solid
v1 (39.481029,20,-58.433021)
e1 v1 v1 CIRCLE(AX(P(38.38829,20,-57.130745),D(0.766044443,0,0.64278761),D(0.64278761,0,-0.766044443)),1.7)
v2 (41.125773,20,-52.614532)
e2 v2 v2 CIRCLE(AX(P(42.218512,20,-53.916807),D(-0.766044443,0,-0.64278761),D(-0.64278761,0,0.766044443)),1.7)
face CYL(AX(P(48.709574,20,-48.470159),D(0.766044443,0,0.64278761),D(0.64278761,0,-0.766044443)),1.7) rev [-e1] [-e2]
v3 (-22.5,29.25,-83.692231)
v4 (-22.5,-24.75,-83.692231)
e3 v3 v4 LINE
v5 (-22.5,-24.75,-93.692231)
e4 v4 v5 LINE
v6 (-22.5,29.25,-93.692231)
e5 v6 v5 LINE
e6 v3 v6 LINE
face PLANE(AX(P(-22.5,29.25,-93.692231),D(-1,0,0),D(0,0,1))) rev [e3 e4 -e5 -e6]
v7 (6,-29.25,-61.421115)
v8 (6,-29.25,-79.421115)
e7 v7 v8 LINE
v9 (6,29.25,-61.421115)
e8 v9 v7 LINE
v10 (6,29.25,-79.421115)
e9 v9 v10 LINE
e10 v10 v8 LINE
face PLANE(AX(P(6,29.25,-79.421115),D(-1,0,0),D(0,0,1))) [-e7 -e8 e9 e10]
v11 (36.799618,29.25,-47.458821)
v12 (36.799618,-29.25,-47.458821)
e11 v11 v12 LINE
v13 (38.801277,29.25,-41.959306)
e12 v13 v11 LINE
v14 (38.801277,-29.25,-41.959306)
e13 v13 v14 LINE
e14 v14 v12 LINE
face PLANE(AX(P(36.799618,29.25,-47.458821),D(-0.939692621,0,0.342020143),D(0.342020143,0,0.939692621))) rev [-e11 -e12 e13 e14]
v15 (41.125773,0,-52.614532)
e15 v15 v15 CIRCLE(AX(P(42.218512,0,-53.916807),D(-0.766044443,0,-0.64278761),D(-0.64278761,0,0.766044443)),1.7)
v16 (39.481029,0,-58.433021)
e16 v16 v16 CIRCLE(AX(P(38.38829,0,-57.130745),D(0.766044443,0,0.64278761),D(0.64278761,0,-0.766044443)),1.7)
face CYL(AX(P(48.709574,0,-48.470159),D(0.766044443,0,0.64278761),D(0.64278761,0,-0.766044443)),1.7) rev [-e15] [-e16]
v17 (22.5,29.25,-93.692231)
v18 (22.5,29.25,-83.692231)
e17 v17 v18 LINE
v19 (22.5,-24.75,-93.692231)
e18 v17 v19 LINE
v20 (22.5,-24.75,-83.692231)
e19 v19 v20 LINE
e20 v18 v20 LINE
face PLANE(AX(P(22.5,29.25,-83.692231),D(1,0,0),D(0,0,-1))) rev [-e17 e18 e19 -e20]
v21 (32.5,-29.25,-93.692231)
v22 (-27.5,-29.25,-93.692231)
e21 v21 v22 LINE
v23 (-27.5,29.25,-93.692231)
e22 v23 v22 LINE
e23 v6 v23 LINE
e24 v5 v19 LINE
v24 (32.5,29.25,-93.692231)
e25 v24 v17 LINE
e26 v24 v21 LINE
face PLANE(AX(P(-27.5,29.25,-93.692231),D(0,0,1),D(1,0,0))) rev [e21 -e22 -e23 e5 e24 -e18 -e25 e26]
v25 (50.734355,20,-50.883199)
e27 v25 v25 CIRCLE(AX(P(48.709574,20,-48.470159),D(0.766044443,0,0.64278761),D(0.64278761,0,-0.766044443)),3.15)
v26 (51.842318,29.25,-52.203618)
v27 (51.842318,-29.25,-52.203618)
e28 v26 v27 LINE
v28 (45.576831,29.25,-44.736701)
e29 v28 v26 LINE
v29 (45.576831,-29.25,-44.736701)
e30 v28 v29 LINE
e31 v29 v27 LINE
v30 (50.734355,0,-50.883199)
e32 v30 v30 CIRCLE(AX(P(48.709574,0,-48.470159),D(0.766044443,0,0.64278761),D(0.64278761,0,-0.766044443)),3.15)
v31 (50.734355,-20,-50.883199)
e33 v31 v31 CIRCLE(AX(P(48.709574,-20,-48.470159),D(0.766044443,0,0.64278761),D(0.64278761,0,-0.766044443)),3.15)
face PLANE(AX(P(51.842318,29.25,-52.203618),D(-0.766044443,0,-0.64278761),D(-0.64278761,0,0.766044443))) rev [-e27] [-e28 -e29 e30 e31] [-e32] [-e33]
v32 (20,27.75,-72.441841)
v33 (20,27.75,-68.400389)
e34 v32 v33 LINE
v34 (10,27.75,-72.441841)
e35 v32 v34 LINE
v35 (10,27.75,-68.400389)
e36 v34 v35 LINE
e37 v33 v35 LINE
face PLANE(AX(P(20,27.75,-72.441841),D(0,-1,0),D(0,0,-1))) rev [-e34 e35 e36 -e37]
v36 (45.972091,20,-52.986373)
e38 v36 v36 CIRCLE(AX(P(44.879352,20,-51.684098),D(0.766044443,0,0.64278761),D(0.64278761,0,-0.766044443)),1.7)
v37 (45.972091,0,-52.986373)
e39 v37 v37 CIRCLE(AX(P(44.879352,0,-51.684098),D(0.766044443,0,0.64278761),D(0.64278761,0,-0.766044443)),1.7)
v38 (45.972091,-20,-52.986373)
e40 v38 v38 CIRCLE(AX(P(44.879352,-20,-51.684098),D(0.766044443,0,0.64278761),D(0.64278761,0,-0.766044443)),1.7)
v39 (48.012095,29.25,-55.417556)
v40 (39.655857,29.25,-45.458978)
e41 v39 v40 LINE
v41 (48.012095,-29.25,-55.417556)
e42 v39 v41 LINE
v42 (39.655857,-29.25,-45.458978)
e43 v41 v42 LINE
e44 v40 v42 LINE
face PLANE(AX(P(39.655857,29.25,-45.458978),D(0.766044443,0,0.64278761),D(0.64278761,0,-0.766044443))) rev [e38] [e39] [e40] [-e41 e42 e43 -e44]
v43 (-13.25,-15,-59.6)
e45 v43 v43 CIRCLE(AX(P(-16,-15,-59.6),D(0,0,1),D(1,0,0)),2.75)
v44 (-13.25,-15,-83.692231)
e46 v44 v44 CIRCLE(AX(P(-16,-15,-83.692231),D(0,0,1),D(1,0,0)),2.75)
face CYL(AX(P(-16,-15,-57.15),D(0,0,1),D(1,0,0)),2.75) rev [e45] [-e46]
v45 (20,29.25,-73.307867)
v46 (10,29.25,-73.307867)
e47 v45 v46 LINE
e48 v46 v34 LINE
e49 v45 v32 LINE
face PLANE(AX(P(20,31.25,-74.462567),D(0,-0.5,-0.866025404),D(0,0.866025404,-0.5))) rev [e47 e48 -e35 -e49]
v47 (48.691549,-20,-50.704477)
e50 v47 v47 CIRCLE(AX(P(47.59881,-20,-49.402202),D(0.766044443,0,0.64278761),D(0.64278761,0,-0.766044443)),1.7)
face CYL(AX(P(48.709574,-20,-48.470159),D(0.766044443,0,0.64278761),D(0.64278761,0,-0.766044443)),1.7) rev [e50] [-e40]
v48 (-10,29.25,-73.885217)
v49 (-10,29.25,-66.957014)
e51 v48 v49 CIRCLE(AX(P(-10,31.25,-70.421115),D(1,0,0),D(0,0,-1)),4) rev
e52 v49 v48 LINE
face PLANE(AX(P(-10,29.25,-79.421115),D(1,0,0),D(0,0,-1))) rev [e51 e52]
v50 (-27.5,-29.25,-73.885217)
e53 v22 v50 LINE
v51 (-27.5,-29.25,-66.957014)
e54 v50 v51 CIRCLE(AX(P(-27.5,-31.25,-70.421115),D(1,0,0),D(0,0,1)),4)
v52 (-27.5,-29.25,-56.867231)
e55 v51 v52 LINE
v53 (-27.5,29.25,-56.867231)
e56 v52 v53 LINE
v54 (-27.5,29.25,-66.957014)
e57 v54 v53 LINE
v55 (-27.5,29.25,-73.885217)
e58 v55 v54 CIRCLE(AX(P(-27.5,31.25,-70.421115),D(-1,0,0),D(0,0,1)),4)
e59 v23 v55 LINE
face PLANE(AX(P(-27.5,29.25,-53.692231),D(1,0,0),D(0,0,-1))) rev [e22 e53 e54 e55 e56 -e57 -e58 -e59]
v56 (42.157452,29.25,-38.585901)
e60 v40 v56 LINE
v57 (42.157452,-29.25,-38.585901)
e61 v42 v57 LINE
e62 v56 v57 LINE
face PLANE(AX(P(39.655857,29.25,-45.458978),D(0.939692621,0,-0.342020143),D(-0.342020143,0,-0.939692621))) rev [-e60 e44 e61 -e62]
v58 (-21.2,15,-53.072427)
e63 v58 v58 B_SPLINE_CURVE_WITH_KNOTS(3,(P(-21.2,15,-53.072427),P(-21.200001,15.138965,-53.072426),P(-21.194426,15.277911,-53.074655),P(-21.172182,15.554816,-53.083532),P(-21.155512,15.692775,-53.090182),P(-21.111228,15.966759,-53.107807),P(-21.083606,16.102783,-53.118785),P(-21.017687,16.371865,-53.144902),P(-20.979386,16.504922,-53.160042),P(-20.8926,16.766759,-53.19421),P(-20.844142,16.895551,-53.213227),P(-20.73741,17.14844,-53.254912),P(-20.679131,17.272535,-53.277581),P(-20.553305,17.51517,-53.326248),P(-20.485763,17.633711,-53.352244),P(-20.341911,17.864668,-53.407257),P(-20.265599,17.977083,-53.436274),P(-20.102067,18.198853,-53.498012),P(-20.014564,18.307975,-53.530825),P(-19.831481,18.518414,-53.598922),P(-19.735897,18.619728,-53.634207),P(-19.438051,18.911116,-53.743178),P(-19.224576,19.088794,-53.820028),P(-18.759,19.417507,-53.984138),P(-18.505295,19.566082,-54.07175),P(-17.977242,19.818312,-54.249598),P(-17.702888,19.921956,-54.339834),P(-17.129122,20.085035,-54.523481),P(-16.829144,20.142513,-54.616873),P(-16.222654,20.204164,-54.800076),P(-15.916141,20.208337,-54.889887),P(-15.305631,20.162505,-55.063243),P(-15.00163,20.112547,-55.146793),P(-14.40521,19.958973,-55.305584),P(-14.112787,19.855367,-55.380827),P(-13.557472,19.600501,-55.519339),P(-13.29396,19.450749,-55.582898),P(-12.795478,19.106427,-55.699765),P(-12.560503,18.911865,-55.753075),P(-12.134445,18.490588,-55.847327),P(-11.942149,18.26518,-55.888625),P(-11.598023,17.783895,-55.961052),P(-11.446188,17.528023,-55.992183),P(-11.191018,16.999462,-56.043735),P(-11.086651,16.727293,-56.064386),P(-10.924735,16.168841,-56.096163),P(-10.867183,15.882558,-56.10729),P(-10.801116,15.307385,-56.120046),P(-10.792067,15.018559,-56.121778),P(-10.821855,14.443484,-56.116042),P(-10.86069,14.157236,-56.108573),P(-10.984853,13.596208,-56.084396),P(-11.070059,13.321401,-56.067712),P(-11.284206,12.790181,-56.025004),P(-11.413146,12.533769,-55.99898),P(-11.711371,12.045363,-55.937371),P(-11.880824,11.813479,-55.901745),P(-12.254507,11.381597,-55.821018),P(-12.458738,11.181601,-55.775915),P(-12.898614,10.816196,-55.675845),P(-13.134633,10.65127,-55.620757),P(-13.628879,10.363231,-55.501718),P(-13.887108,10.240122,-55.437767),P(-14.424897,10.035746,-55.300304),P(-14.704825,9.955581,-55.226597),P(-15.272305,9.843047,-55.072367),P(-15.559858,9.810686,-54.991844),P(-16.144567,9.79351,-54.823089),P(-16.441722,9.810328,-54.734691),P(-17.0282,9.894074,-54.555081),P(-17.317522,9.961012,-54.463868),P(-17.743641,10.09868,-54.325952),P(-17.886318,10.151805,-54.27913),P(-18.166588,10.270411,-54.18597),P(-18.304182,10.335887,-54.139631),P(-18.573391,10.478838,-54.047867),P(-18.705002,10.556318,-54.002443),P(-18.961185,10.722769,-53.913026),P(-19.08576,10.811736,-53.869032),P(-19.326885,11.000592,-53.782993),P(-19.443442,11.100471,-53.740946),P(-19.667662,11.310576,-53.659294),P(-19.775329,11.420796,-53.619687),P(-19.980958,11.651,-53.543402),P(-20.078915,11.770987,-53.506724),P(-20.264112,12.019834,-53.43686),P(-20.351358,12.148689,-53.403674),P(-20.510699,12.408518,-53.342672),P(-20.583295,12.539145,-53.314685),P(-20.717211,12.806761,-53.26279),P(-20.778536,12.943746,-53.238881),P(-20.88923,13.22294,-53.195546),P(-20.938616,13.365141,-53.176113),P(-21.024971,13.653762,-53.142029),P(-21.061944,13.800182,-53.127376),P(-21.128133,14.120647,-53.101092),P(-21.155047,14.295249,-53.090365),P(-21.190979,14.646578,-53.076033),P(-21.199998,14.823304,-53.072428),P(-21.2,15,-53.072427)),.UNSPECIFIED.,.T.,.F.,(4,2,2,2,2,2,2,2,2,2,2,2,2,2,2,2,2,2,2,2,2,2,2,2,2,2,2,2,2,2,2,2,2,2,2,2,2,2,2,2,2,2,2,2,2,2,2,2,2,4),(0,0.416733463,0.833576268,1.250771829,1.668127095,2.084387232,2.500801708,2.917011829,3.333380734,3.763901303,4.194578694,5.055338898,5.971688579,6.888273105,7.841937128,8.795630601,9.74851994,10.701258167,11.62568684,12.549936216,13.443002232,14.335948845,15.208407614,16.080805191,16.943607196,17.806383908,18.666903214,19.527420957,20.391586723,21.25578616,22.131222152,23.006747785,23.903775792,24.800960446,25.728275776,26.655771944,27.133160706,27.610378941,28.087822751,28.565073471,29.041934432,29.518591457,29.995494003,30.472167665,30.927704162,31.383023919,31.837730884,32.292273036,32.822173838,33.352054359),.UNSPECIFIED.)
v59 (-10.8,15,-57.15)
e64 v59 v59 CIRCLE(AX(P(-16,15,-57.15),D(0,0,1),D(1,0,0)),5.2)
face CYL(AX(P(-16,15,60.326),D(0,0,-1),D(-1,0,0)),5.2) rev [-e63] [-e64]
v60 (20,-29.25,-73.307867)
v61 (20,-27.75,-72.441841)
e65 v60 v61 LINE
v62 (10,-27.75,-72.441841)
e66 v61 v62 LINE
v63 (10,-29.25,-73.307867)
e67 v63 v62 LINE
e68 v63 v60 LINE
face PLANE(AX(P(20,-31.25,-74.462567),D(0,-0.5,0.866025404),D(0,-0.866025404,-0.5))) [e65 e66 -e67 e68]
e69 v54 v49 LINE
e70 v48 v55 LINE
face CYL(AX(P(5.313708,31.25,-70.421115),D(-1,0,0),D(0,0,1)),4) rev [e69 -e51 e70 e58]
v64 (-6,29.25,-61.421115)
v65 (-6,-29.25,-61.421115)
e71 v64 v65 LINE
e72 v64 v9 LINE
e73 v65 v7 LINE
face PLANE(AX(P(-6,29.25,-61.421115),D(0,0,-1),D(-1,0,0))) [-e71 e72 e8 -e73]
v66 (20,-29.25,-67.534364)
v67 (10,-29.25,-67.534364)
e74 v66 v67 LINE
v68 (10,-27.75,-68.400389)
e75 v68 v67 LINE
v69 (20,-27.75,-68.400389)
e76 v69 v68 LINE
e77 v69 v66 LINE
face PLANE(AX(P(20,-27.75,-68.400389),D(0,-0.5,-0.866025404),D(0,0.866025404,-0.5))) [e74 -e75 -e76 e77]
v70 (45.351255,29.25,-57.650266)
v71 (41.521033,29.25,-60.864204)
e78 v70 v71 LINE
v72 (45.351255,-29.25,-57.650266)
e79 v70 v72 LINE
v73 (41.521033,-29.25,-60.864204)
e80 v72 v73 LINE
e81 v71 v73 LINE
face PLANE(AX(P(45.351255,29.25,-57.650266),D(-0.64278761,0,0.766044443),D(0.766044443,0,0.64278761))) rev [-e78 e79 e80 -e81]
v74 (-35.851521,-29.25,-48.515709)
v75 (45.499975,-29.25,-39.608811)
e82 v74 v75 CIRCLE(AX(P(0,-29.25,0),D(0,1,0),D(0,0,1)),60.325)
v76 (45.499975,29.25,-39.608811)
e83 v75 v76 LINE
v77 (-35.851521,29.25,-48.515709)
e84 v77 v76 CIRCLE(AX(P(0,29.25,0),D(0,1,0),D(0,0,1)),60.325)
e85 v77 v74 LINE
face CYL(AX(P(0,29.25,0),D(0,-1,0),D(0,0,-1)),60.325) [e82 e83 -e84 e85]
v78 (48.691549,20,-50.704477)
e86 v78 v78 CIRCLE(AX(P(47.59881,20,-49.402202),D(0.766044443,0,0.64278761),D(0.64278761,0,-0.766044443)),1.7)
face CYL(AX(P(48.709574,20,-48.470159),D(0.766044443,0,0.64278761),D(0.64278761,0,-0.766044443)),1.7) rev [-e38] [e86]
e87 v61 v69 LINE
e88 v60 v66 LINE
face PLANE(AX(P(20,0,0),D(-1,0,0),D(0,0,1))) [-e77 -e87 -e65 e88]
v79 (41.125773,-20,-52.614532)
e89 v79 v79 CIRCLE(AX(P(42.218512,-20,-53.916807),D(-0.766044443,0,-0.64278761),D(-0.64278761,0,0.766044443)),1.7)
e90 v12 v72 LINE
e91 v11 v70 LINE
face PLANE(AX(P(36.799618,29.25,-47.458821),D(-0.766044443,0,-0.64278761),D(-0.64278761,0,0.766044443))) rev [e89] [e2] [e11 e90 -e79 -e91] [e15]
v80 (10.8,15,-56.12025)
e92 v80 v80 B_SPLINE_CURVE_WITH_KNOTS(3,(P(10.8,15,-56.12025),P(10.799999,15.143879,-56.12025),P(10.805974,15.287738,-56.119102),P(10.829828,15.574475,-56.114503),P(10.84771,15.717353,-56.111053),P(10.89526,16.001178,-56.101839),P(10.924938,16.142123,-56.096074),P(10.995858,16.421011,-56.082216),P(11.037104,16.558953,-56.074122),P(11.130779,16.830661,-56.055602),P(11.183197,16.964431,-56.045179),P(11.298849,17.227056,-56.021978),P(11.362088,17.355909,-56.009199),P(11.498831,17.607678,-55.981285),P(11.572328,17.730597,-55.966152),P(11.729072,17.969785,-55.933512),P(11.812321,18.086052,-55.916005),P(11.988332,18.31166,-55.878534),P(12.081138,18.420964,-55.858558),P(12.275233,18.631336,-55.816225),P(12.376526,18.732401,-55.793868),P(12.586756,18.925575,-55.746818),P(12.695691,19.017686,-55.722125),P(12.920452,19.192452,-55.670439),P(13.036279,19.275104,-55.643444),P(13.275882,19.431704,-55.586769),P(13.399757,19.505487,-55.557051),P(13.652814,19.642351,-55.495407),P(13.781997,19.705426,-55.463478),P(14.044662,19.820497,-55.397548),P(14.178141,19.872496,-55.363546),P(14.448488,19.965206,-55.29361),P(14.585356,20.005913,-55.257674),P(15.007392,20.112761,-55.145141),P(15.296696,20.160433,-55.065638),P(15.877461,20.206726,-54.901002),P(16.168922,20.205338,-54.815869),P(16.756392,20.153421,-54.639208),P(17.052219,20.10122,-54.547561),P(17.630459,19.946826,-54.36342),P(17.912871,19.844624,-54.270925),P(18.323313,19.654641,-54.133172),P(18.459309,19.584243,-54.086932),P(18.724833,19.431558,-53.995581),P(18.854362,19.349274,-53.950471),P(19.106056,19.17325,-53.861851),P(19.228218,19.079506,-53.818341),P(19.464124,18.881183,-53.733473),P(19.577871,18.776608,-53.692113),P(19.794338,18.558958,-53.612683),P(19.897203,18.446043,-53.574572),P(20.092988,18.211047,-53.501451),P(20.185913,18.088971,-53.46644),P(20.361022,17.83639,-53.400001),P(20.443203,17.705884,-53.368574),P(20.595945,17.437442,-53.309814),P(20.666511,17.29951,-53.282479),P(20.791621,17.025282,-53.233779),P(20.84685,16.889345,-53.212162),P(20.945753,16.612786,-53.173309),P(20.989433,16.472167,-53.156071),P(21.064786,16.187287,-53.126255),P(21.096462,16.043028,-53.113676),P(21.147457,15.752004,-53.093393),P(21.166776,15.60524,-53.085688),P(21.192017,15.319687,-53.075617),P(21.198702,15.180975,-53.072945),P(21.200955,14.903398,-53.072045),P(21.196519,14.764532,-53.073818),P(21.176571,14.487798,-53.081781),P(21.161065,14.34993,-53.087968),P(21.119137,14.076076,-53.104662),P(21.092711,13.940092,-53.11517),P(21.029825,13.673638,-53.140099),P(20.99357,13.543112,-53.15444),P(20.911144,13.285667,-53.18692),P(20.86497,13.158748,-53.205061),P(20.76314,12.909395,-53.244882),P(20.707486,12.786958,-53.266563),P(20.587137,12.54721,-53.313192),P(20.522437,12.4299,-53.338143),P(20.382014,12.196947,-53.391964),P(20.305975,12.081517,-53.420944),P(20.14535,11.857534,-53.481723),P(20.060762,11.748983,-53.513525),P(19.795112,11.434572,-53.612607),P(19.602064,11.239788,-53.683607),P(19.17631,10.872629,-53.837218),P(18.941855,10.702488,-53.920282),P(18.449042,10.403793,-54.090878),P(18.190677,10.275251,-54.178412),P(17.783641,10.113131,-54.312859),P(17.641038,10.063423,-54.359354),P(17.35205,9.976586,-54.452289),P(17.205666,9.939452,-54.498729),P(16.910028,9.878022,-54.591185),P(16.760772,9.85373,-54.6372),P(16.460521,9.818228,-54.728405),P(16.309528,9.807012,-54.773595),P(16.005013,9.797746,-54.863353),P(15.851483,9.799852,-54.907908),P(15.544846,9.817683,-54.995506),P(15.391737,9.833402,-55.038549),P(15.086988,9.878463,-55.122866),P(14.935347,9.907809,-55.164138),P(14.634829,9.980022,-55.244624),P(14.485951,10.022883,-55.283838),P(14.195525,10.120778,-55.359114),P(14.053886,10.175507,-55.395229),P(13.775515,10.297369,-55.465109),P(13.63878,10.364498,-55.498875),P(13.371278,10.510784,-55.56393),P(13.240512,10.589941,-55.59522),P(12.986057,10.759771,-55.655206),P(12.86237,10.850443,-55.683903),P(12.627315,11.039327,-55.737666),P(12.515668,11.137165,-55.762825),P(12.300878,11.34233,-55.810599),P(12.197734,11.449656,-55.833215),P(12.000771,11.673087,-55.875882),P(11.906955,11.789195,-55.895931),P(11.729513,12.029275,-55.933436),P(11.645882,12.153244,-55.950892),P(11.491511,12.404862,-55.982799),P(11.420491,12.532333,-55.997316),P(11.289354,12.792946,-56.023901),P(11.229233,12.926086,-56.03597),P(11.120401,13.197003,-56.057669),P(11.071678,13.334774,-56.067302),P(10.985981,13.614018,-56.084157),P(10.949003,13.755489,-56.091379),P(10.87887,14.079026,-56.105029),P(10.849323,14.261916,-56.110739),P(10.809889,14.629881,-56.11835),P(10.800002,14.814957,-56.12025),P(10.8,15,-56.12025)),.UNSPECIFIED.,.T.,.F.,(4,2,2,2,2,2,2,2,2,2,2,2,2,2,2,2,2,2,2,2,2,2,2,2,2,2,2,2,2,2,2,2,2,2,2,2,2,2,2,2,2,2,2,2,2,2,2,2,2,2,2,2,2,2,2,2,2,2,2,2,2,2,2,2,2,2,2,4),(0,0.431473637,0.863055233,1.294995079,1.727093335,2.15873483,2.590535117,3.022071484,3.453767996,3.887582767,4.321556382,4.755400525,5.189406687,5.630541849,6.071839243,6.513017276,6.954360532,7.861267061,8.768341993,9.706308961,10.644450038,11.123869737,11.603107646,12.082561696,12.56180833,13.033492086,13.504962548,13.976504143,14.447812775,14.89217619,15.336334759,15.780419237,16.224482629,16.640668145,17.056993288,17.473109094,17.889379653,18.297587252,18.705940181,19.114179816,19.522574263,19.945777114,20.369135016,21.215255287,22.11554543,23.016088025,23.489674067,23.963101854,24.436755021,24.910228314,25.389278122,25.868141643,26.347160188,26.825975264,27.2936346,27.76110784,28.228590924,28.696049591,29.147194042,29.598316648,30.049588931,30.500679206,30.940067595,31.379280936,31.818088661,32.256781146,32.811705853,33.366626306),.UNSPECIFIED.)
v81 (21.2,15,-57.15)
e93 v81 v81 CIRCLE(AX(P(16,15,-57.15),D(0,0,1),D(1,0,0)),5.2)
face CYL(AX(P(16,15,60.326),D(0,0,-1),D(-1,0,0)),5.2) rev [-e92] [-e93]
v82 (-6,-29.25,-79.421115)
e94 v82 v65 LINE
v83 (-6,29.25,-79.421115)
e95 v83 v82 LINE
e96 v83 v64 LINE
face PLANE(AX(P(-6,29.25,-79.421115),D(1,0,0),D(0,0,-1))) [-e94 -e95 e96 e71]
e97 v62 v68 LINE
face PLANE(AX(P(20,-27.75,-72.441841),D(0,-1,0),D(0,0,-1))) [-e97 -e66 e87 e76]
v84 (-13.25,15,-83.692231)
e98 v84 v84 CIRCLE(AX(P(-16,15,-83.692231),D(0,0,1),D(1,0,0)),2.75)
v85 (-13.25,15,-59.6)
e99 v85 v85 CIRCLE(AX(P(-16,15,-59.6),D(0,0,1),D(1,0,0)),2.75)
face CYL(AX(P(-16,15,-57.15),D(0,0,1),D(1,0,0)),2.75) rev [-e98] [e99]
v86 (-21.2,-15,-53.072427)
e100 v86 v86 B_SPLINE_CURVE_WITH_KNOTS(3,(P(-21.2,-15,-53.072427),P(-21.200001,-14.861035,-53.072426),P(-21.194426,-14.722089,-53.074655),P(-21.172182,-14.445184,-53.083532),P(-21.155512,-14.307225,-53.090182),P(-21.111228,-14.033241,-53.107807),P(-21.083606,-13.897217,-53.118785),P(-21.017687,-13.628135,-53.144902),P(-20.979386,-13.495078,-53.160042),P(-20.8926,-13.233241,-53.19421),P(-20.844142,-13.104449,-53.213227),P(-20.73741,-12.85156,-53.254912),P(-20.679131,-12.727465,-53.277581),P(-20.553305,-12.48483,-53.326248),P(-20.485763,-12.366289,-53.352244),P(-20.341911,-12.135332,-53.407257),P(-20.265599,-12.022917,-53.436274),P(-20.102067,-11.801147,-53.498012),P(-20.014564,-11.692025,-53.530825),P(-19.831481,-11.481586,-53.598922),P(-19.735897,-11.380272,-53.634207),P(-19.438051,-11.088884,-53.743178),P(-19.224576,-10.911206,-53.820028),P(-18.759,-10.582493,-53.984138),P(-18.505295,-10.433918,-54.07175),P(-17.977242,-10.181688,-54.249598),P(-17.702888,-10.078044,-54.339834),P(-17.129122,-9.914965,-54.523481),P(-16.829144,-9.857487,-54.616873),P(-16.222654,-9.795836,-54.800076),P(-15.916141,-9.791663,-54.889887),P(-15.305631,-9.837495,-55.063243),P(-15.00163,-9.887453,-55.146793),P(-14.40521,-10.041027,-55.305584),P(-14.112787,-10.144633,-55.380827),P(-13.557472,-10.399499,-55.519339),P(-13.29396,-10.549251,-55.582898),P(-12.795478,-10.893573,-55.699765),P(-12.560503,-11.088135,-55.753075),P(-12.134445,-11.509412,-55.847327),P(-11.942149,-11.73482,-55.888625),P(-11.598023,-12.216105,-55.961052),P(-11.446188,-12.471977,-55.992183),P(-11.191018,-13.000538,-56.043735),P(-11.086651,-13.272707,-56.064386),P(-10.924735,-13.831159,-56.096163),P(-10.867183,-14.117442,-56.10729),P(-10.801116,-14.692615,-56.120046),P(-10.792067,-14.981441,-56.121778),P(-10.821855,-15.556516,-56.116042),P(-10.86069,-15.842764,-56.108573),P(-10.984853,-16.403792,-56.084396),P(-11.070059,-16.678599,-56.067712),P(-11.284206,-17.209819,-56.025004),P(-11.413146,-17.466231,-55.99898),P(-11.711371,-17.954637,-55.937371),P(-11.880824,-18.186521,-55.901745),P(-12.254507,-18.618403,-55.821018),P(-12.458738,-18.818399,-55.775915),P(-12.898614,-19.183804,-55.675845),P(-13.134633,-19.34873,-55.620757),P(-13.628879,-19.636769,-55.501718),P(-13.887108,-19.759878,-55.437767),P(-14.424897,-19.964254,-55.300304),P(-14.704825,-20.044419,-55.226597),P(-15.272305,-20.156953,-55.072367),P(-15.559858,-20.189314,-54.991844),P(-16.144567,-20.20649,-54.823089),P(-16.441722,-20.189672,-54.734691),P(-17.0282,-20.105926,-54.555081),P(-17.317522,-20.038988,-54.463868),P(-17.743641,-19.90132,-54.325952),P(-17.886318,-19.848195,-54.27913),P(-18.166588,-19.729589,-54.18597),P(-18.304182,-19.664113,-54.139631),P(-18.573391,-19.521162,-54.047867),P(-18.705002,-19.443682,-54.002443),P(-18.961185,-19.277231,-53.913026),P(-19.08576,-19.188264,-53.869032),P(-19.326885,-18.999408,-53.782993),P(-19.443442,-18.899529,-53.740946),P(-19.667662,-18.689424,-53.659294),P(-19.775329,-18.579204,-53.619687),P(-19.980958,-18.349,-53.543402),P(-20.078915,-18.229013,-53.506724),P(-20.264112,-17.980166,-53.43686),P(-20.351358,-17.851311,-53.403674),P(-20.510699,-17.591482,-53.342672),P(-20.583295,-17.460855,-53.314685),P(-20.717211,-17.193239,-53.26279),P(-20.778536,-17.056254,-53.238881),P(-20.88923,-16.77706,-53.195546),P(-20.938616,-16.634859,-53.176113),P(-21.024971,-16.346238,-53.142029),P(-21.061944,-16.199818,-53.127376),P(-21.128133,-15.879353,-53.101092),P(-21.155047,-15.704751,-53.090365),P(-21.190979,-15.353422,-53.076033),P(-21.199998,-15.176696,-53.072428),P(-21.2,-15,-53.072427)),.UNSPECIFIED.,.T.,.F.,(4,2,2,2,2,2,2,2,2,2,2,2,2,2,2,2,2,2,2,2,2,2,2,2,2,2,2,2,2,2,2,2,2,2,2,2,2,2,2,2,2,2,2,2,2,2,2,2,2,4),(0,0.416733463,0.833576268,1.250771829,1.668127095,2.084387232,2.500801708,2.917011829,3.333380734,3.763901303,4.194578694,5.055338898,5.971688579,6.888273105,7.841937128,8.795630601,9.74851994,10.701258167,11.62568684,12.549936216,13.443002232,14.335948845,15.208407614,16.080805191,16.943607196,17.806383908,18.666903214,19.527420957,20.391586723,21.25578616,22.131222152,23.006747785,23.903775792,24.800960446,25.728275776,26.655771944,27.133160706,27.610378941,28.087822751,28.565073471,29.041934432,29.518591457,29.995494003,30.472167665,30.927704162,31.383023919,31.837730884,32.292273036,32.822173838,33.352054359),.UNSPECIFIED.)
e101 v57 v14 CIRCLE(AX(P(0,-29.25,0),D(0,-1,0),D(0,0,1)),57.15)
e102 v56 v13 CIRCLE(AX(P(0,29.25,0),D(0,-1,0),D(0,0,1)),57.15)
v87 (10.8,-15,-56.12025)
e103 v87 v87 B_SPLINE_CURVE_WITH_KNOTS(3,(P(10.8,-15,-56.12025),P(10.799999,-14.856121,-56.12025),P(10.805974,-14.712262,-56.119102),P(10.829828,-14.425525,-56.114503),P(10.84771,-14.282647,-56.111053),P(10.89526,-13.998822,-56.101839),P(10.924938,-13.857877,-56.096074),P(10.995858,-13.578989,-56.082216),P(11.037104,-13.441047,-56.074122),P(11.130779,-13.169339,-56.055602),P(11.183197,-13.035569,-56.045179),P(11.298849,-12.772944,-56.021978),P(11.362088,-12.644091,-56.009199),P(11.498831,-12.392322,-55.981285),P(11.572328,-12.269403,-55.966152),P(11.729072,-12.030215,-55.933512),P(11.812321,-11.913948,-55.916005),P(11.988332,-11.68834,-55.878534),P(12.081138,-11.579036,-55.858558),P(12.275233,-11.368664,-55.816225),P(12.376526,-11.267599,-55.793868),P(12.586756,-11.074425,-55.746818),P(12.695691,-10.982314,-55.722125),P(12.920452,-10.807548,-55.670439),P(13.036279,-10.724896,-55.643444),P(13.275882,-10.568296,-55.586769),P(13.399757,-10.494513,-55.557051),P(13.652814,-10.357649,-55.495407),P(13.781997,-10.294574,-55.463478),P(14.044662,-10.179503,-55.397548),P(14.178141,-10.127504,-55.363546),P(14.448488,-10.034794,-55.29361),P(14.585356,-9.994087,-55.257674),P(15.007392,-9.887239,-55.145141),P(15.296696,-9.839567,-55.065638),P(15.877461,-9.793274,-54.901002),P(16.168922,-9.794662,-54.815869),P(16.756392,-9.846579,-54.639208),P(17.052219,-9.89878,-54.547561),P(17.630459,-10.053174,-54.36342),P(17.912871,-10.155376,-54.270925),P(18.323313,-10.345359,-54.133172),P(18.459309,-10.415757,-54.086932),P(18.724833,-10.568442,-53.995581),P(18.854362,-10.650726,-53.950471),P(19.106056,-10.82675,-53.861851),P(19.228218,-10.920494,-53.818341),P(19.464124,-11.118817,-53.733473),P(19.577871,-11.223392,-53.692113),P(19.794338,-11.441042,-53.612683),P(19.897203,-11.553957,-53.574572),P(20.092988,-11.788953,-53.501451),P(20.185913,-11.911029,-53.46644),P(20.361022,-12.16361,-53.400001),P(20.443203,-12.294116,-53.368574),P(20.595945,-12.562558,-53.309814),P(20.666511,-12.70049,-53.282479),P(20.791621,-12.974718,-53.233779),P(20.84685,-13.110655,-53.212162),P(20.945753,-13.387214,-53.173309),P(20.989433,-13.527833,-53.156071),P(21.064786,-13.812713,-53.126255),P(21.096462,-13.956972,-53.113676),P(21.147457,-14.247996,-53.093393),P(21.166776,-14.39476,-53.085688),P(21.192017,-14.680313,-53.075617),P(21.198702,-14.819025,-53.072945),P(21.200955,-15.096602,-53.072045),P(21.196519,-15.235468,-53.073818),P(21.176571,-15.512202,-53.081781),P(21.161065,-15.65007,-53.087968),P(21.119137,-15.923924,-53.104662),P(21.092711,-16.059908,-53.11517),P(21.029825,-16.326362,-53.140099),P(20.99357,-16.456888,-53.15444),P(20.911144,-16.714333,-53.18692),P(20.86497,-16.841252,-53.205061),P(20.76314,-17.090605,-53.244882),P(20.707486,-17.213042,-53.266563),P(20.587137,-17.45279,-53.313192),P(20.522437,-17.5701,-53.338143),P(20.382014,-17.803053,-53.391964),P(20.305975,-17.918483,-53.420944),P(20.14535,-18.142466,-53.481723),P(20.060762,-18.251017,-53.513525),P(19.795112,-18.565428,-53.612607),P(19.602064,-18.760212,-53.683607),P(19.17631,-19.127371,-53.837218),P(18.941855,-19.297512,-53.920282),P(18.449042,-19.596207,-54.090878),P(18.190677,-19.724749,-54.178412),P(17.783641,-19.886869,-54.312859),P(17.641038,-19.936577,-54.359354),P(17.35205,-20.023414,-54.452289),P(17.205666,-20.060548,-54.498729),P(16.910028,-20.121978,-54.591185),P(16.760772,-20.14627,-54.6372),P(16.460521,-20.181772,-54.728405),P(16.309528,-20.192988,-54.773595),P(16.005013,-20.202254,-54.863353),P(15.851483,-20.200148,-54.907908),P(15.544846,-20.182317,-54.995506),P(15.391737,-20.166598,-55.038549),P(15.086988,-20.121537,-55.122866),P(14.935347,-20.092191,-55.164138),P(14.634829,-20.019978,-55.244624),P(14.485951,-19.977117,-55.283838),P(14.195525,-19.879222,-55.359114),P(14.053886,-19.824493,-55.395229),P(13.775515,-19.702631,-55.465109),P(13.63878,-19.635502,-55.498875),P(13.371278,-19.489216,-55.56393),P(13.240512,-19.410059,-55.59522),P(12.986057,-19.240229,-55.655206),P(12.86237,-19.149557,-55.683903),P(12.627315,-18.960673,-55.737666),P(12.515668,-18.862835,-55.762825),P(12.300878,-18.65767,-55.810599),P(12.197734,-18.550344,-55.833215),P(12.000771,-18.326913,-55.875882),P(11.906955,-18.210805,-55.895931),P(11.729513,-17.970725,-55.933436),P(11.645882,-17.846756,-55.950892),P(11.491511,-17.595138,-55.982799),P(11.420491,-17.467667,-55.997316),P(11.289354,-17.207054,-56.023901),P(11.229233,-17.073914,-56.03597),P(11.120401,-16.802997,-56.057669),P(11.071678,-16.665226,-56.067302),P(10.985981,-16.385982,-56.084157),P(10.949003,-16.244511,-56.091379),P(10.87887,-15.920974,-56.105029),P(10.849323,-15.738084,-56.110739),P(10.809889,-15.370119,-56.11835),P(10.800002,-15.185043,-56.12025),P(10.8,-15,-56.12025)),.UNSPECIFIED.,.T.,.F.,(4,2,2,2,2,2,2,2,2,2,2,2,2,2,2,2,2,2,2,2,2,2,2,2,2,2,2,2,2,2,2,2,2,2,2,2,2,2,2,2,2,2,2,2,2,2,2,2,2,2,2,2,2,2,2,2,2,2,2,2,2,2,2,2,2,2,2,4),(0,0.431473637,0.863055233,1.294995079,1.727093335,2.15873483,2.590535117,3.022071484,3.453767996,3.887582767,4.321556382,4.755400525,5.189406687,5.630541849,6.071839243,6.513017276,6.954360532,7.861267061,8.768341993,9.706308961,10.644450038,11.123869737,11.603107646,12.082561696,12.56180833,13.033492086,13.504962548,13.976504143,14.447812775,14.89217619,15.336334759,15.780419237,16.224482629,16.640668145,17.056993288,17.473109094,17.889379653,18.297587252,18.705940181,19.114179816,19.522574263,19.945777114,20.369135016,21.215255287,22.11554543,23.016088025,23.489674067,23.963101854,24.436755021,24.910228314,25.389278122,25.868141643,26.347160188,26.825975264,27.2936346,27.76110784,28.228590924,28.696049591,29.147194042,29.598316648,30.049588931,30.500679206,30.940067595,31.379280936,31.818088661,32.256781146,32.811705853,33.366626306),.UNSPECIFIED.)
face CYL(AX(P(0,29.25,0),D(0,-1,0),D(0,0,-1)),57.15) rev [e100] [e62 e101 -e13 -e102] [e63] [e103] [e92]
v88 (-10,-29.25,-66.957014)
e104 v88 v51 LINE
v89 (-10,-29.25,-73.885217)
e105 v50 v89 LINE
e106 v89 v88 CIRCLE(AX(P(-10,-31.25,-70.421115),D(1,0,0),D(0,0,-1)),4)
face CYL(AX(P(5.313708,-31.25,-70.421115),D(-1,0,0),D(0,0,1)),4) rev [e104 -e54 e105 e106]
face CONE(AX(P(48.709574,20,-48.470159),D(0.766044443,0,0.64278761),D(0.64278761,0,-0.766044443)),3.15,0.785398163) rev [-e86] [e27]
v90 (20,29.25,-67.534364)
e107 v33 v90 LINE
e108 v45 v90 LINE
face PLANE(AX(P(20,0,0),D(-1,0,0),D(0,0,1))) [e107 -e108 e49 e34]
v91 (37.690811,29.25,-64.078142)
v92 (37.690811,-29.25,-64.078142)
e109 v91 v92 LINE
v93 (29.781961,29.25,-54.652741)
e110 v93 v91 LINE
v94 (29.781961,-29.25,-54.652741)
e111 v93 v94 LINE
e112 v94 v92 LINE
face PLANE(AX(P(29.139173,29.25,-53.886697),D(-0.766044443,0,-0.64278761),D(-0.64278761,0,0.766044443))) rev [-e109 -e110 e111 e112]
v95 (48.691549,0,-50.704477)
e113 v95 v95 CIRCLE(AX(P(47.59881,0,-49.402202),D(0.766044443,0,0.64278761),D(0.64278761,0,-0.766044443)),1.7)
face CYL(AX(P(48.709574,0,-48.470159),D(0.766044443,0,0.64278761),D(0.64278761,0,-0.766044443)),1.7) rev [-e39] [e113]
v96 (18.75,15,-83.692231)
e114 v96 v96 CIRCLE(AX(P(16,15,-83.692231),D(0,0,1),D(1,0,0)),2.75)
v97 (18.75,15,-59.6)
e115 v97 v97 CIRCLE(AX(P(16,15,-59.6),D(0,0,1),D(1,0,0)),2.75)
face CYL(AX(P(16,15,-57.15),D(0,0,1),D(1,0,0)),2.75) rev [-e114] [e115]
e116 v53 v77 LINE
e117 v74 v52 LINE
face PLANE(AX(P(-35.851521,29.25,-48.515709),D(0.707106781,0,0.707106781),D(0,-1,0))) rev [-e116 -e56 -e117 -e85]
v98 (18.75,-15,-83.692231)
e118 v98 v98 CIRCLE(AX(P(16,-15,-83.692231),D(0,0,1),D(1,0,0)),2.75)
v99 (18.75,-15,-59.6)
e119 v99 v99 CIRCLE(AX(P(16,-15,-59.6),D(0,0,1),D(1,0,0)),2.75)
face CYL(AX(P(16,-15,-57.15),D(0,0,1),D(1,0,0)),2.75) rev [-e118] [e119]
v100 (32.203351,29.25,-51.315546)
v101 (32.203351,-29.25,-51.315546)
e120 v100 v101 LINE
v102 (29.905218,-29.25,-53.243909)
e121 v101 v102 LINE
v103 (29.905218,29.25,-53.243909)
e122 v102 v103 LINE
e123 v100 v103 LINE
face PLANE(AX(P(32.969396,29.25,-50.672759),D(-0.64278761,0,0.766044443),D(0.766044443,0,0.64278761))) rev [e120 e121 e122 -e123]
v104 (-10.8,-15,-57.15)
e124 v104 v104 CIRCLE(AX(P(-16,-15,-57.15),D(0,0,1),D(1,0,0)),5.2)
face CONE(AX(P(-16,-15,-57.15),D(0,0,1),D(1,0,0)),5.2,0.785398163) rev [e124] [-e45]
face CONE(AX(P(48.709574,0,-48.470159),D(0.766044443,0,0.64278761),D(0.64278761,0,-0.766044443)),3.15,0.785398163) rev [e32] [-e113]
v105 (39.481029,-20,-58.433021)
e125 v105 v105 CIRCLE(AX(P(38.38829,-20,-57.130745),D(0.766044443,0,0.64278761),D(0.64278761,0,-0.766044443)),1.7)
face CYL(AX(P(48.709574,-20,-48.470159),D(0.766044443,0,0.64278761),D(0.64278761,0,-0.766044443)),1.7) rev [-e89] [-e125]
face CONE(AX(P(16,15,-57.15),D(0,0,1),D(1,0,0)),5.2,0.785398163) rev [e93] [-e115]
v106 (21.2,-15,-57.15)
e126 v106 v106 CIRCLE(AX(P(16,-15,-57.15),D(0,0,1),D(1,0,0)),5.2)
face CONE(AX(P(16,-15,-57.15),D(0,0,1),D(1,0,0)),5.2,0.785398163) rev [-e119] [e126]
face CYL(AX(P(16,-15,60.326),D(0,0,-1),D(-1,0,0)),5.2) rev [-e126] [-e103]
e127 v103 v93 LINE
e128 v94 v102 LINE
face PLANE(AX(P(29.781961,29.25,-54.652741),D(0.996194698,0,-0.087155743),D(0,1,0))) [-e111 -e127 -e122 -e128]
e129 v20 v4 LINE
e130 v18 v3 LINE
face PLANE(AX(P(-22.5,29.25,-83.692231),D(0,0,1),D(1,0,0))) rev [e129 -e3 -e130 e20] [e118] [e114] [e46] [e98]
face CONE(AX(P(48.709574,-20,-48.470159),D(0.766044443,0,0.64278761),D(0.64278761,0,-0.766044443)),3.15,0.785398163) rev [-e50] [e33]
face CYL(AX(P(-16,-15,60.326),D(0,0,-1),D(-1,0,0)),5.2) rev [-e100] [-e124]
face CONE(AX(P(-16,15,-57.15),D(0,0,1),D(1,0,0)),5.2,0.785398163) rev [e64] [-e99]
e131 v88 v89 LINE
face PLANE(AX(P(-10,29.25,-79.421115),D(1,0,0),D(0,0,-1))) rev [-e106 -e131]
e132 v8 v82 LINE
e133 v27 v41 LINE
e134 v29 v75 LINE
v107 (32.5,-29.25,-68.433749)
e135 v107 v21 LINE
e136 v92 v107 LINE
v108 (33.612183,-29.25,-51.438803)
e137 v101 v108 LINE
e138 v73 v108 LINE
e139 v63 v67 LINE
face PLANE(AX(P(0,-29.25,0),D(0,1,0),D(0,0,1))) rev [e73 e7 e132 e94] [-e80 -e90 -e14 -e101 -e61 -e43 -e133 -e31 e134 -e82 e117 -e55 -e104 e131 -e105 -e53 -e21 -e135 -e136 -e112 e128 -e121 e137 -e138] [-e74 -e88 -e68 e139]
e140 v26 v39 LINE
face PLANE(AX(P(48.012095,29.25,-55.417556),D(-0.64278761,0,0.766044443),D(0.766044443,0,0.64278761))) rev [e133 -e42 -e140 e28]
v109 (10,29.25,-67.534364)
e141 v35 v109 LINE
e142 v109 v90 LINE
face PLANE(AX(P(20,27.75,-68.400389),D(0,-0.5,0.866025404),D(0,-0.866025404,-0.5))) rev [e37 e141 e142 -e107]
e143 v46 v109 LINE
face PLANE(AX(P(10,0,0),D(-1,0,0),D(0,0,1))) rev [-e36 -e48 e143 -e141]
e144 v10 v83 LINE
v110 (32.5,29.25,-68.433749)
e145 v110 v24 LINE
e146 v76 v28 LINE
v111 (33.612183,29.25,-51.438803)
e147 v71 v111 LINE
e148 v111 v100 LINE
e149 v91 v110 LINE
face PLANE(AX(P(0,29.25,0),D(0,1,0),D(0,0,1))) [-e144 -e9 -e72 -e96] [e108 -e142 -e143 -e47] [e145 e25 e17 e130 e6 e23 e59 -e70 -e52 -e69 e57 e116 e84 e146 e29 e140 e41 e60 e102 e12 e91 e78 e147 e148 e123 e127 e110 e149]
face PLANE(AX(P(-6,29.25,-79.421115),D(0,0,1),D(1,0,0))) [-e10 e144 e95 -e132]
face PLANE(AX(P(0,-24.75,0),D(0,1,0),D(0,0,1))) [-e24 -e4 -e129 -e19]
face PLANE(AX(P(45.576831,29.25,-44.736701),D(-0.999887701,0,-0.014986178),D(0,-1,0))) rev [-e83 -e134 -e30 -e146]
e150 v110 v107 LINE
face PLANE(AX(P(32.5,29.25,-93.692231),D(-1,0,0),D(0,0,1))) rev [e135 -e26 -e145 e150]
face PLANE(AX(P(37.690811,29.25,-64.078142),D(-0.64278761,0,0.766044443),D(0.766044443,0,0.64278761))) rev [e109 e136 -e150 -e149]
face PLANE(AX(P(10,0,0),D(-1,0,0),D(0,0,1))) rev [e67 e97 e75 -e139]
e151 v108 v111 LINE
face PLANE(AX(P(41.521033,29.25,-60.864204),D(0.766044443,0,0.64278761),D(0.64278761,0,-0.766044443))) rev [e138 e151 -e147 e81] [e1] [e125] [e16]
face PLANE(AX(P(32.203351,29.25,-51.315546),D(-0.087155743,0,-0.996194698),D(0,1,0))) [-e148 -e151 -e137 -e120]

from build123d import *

# Parameters (mm, degrees)
SKETCH1_W                                       = 12
SKETCH1_H                                       = 18
BOSS_EXTRUDE1_DEPTH                             = 29.25
SKETCH4_W                                       = 45
SKETCH4_H                                       = 10
BOSS_EXTRUDE2_DEPTH                             = 4.5
CSK_FOR_M5_FLAT_HEAD_MACHINE_SCREW1_AT_2_COUNT  = 2
CSK_FOR_M5_FLAT_HEAD_MACHINE_SCREW1_AT_2_PITCH  = 32
CSK_FOR_M5_FLAT_HEAD_MACHINE_SCREW1_AT_3_COUNT  = 2
CSK_FOR_M5_FLAT_HEAD_MACHINE_SCREW1_AT_3_PITCH  = 43.863424399
CSK_FOR_M5_FLAT_HEAD_MACHINE_SCREW1_AT_4_COUNT  = 2
CSK_FOR_M5_FLAT_HEAD_MACHINE_SCREW1_AT_4_PITCH  = 30
CUT_EXTRUDE1_REACH                              = 137.259
CUT_EXTRUDE1_END_RADIUS                         = 57.15
SKETCH13_R                                      = 5.2
CHAMFER1_SIZE                                   = 3.556619638
CHAMFER1_SIZE_2                                 = 3.175
CHAMFER2_SIZE                                   = 1
CSK_FOR_M3_FLAT_HEAD_MACHINE_SCREW1_D           = 3.4
CSK_FOR_M3_FLAT_HEAD_MACHINE_SCREW1_DEPTH       = 15
CSK_FOR_M3_FLAT_HEAD_MACHINE_SCREW1_CSINK_D     = 6.3
CSK_FOR_M3_FLAT_HEAD_MACHINE_SCREW1_CSINK_ANGLE = 90
CSK_FOR_M3_FLAT_HEAD_MACHINE_SCREW1_TIP         = 1.021463052
SKETCH17_R                                      = 4
CUT_EXTRUDE2_DEPTH                              = 17.5
CUT_EXTRUDE3_START                              = -4
CUT_EXTRUDE3_DEPTH                              = 10


with BuildPart() as part:
    # Sketch1 → Boss-Extrude1 (new, symmetric)
    with BuildSketch(Plane(origin=(0, 0, 0), x_dir=(1, 0, 0), z_dir=(0, 1, 0))):
        with BuildLine():
            Line((-27.5, 53.692230583), (-27.5, 93.692230583))
            Line((-27.5, 93.692230583), (-22.5, 93.692230583))
            Line((-22.5, 93.692230583), (-22.5, 83.692230583))
            Line((-22.5, 83.692230583), (22.5, 83.692230583))
            Line((22.5, 83.692230583), (22.5, 93.692230583))
            Line((22.5, 93.692230583), (32.5, 93.692230583))
            Line((32.5, 93.692230583), (32.5, 68.433749194))
            Line((32.5, 68.433749194), (37.690810999, 64.078141599))
            Line((37.690810999, 64.078141599), (29.139173324, 53.886696677))
            Line((29.139173324, 53.886696677), (32.96939554, 50.672758629))
            Line((32.96939554, 50.672758629), (41.521033215, 60.864203551))
            Line((41.521033215, 60.864203551), (45.351255431, 57.650265502))
            Line((45.351255431, 57.650265502), (36.799617755, 47.45882058))
            Line((36.799617755, 47.45882058), (38.801277269, 41.959306266))
            ThreePointArc((38.801277269, 41.959306266), (-40.514490328, -40.307549832), (42.157451983, 38.585900823))
            Line((42.157451983, 38.585900823), (39.655856522, 45.458977865))
            Line((39.655856522, 45.458977865), (48.012095448, 55.417555625))
            Line((48.012095448, 55.417555625), (51.842317663, 52.203617577))
            Line((51.842317663, 52.203617577), (43.290679988, 42.012172655))
            ThreePointArc((43.290679988, 42.012172655), (-9.820505686, -59.520276319), (-27.5, 53.692230583))
        make_face()
        with Locations((0, 70.421115292)):
            Rectangle(SKETCH1_W, SKETCH1_H, mode=Mode.SUBTRACT)
    extrude(amount=BOSS_EXTRUDE1_DEPTH, both=True)

    # Sketch4 → Boss-Extrude2 (add)
    with BuildSketch(Plane.XZ.offset(29.25)):
        with Locations((0, -88.692230583)):
            Rectangle(SKETCH4_W, SKETCH4_H)
    extrude(amount=-BOSS_EXTRUDE2_DEPTH)

    # Sketch12 → CSK for M5 Flat Head Machine Screw1 (revolve, cut)
    with BuildSketch(Plane(origin=(-16, 15, -57.15), x_dir=(0, -1, 0), z_dir=(1, 0, 0))):
        Polygon((0, 0), (0, 36.542230583), (2.75, 36.542230583), (2.75, 2.45), (5.2, 0), align=None)
    csk_for_m5_flat_head_machine_screw1 = revolve(axis=Axis((-16, 15, -50.8), (0, 0, -1)), mode=Mode.SUBTRACT)

    # CSK for M5 Flat Head Machine Screw1 at 2: CSK for M5 Flat Head Machine Screw1 ×2
    with Locations(*[(i * CSK_FOR_M5_FLAT_HEAD_MACHINE_SCREW1_AT_2_PITCH, 0, 0) for i in range(1, CSK_FOR_M5_FLAT_HEAD_MACHINE_SCREW1_AT_2_COUNT)]):
        add(csk_for_m5_flat_head_machine_screw1, mode=Mode.SUBTRACT)

    # CSK for M5 Flat Head Machine Screw1 at 3: CSK for M5 Flat Head Machine Screw1 ×2
    with Locations(*[Vector(0.7295372041400852, -0.6839411288813297, 0) * (i * CSK_FOR_M5_FLAT_HEAD_MACHINE_SCREW1_AT_3_PITCH) for i in range(1, CSK_FOR_M5_FLAT_HEAD_MACHINE_SCREW1_AT_3_COUNT)]):
        add(csk_for_m5_flat_head_machine_screw1, mode=Mode.SUBTRACT)

    # CSK for M5 Flat Head Machine Screw1 at 4: CSK for M5 Flat Head Machine Screw1 ×2
    with Locations(*[(0, -i * CSK_FOR_M5_FLAT_HEAD_MACHINE_SCREW1_AT_4_PITCH, 0) for i in range(1, CSK_FOR_M5_FLAT_HEAD_MACHINE_SCREW1_AT_4_COUNT)]):
        add(csk_for_m5_flat_head_machine_screw1, mode=Mode.SUBTRACT)

    # Cut-Extrude1: up to this cylinder (the profile starts outside it)
    cut_extrude1_end = Plane(origin=(0, 0, 0), z_dir=(0, -1, 0)) * Cylinder(CUT_EXTRUDE1_END_RADIUS, 419.818, mode=Mode.PRIVATE)
    # Sketch13 → Cut-Extrude1 (cut, up to the surface)
    with BuildSketch(Plane.XY.offset(-57.15), mode=Mode.PRIVATE) as cut_extrude1_sk1:
        with Locations(Location((-16, -15, 0), (0, 0, 180))):
            Circle(SKETCH13_R)
    cut_extrude1_tool1 = extrude(cut_extrude1_sk1.sketch, amount=CUT_EXTRUDE1_REACH, mode=Mode.PRIVATE) - cut_extrude1_end
    add(cut_extrude1_tool1.solids().sort_by_distance((-16, -15, -57.15))[0], mode=Mode.SUBTRACT)
    # Sketch13 → Cut-Extrude1 (cut, up to the surface)
    with BuildSketch(Plane.XY.offset(-57.15), mode=Mode.PRIVATE) as cut_extrude1_sk2:
        with Locations(Location((16, -15, 0), (0, 0, 180))):
            Circle(SKETCH13_R)
    cut_extrude1_tool2 = extrude(cut_extrude1_sk2.sketch, amount=CUT_EXTRUDE1_REACH, mode=Mode.PRIVATE) - cut_extrude1_end
    add(cut_extrude1_tool2.solids().sort_by_distance((16, -15, -57.15))[0], mode=Mode.SUBTRACT)
    # Sketch13 → Cut-Extrude1 (cut, up to the surface)
    with BuildSketch(Plane.XY.offset(-57.15), mode=Mode.PRIVATE) as cut_extrude1_sk3:
        with Locations(Location((16, 15, 0), (0, 0, 180))):
            Circle(SKETCH13_R)
    cut_extrude1_tool3 = extrude(cut_extrude1_sk3.sketch, amount=CUT_EXTRUDE1_REACH, mode=Mode.PRIVATE) - cut_extrude1_end
    add(cut_extrude1_tool3.solids().sort_by_distance((16, 15, -57.15))[0], mode=Mode.SUBTRACT)
    # Sketch13 → Cut-Extrude1 (cut, up to the surface)
    with BuildSketch(Plane.XY.offset(-57.15), mode=Mode.PRIVATE) as cut_extrude1_sk4:
        with Locations(Location((-16, 15, 0), (0, 0, 180))):
            Circle(SKETCH13_R)
    cut_extrude1_tool4 = extrude(cut_extrude1_sk4.sketch, amount=CUT_EXTRUDE1_REACH, mode=Mode.PRIVATE) - cut_extrude1_end
    add(cut_extrude1_tool4.solids().sort_by_distance((-16, 15, -57.15))[0], mode=Mode.SUBTRACT)

    # Chamfer1
    # the kernel refuses this chamfer: 7.31254539, 3.556619638, 3.175 mm, written as the material it adds along each edge
    with BuildSketch(Plane(origin=(43.290679988, -29.25, -42.012172655), x_dir=(0.6767582135890655, 0, 0.736205352017857), z_dir=(0, 1, 0))) as chamfer1_piece_1:
        with BuildLine():
            Line((3.264526209, 0), (-CHAMFER1_SIZE * 0.128954224472, CHAMFER1_SIZE * 0.99165054742))
            Line((-CHAMFER1_SIZE * 0.128954224472, CHAMFER1_SIZE * 0.99165054742), (0, 0))
            ThreePointArc((0, 0), (1.683964682, 0.02206463), (3.264526209, 0))
        make_face()
    extrude(amount=58.5)
    with BuildSketch(Plane(origin=(-27.5, -29.25, -53.692230583), x_dir=(0, 0, -1), z_dir=(0, 1, 0))) as chamfer1_piece_2:
        with BuildLine():
            Line((CHAMFER1_SIZE_2, 0), (-5.17652137, 8.35152137))
            ThreePointArc((-5.17652137, 8.35152137), (-2.493388985, 4.40273098), (0, 0))
            Line((0, 0), (CHAMFER1_SIZE_2, 0))
        make_face()
    extrude(amount=58.5)

    # Chamfer2
    chamfer2_edges = [part.edges().sort_by_distance(p)[0] for p in [
        (29.139173324, 0, -53.886696677),
        (32.96939554, 0, -50.672758629),
    ]]
    chamfer(chamfer2_edges, length=CHAMFER2_SIZE)

    # CSK for M3 Flat Head Machine Screw1
    with Locations(Plane(origin=(4.717057163, 0, 3.958080926), x_dir=(0.6427876096865344, 0, -0.7660444431189822), z_dir=(0.7660444431189822, 0, 0.6427876096865344))):
        with Locations((68.440207181, 20), (68.440207181, 0), (68.440207181, -20)):
            CounterSinkHole(CSK_FOR_M3_FLAT_HEAD_MACHINE_SCREW1_D / 2, CSK_FOR_M3_FLAT_HEAD_MACHINE_SCREW1_CSINK_D / 2, depth=CSK_FOR_M3_FLAT_HEAD_MACHINE_SCREW1_DEPTH, counter_sink_angle=CSK_FOR_M3_FLAT_HEAD_MACHINE_SCREW1_CSINK_ANGLE)
            with Locations((0, 0, -(CSK_FOR_M3_FLAT_HEAD_MACHINE_SCREW1_DEPTH + CSK_FOR_M3_FLAT_HEAD_MACHINE_SCREW1_TIP / 2))):  # 118° drill point
                Cone(0, CSK_FOR_M3_FLAT_HEAD_MACHINE_SCREW1_D / 2, CSK_FOR_M3_FLAT_HEAD_MACHINE_SCREW1_TIP, mode=Mode.SUBTRACT)

    # Sketch17 → Cut-Extrude2 (cut)
    with BuildSketch(Plane.ZY.offset(27.5)):
        with Locations((-70.421115292, 31.25)):
            Circle(SKETCH17_R)
    cut_extrude2 = extrude(amount=-CUT_EXTRUDE2_DEPTH, mode=Mode.SUBTRACT)

    # Sketch19 → Cut-Extrude3 (cut)
    with BuildSketch(Plane.ZY.offset(-6).offset(CUT_EXTRUDE3_START)):
        Polygon((-68.400389349, 34.75), (-72.441841234, 34.75), (-74.462567176, 31.25), (-72.441841234, 27.75), (-68.400389349, 27.75), (-66.379663407, 31.25), align=None)
    cut_extrude3 = extrude(amount=-CUT_EXTRUDE3_DEPTH, mode=Mode.SUBTRACT)

    # Mirror1: Cut-Extrude2, Cut-Extrude3 across plane
    add(cut_extrude2.mirror(Plane.ZX), mode=Mode.SUBTRACT)
    add(cut_extrude3.mirror(Plane.ZX), mode=Mode.SUBTRACT)


solid = part.part
